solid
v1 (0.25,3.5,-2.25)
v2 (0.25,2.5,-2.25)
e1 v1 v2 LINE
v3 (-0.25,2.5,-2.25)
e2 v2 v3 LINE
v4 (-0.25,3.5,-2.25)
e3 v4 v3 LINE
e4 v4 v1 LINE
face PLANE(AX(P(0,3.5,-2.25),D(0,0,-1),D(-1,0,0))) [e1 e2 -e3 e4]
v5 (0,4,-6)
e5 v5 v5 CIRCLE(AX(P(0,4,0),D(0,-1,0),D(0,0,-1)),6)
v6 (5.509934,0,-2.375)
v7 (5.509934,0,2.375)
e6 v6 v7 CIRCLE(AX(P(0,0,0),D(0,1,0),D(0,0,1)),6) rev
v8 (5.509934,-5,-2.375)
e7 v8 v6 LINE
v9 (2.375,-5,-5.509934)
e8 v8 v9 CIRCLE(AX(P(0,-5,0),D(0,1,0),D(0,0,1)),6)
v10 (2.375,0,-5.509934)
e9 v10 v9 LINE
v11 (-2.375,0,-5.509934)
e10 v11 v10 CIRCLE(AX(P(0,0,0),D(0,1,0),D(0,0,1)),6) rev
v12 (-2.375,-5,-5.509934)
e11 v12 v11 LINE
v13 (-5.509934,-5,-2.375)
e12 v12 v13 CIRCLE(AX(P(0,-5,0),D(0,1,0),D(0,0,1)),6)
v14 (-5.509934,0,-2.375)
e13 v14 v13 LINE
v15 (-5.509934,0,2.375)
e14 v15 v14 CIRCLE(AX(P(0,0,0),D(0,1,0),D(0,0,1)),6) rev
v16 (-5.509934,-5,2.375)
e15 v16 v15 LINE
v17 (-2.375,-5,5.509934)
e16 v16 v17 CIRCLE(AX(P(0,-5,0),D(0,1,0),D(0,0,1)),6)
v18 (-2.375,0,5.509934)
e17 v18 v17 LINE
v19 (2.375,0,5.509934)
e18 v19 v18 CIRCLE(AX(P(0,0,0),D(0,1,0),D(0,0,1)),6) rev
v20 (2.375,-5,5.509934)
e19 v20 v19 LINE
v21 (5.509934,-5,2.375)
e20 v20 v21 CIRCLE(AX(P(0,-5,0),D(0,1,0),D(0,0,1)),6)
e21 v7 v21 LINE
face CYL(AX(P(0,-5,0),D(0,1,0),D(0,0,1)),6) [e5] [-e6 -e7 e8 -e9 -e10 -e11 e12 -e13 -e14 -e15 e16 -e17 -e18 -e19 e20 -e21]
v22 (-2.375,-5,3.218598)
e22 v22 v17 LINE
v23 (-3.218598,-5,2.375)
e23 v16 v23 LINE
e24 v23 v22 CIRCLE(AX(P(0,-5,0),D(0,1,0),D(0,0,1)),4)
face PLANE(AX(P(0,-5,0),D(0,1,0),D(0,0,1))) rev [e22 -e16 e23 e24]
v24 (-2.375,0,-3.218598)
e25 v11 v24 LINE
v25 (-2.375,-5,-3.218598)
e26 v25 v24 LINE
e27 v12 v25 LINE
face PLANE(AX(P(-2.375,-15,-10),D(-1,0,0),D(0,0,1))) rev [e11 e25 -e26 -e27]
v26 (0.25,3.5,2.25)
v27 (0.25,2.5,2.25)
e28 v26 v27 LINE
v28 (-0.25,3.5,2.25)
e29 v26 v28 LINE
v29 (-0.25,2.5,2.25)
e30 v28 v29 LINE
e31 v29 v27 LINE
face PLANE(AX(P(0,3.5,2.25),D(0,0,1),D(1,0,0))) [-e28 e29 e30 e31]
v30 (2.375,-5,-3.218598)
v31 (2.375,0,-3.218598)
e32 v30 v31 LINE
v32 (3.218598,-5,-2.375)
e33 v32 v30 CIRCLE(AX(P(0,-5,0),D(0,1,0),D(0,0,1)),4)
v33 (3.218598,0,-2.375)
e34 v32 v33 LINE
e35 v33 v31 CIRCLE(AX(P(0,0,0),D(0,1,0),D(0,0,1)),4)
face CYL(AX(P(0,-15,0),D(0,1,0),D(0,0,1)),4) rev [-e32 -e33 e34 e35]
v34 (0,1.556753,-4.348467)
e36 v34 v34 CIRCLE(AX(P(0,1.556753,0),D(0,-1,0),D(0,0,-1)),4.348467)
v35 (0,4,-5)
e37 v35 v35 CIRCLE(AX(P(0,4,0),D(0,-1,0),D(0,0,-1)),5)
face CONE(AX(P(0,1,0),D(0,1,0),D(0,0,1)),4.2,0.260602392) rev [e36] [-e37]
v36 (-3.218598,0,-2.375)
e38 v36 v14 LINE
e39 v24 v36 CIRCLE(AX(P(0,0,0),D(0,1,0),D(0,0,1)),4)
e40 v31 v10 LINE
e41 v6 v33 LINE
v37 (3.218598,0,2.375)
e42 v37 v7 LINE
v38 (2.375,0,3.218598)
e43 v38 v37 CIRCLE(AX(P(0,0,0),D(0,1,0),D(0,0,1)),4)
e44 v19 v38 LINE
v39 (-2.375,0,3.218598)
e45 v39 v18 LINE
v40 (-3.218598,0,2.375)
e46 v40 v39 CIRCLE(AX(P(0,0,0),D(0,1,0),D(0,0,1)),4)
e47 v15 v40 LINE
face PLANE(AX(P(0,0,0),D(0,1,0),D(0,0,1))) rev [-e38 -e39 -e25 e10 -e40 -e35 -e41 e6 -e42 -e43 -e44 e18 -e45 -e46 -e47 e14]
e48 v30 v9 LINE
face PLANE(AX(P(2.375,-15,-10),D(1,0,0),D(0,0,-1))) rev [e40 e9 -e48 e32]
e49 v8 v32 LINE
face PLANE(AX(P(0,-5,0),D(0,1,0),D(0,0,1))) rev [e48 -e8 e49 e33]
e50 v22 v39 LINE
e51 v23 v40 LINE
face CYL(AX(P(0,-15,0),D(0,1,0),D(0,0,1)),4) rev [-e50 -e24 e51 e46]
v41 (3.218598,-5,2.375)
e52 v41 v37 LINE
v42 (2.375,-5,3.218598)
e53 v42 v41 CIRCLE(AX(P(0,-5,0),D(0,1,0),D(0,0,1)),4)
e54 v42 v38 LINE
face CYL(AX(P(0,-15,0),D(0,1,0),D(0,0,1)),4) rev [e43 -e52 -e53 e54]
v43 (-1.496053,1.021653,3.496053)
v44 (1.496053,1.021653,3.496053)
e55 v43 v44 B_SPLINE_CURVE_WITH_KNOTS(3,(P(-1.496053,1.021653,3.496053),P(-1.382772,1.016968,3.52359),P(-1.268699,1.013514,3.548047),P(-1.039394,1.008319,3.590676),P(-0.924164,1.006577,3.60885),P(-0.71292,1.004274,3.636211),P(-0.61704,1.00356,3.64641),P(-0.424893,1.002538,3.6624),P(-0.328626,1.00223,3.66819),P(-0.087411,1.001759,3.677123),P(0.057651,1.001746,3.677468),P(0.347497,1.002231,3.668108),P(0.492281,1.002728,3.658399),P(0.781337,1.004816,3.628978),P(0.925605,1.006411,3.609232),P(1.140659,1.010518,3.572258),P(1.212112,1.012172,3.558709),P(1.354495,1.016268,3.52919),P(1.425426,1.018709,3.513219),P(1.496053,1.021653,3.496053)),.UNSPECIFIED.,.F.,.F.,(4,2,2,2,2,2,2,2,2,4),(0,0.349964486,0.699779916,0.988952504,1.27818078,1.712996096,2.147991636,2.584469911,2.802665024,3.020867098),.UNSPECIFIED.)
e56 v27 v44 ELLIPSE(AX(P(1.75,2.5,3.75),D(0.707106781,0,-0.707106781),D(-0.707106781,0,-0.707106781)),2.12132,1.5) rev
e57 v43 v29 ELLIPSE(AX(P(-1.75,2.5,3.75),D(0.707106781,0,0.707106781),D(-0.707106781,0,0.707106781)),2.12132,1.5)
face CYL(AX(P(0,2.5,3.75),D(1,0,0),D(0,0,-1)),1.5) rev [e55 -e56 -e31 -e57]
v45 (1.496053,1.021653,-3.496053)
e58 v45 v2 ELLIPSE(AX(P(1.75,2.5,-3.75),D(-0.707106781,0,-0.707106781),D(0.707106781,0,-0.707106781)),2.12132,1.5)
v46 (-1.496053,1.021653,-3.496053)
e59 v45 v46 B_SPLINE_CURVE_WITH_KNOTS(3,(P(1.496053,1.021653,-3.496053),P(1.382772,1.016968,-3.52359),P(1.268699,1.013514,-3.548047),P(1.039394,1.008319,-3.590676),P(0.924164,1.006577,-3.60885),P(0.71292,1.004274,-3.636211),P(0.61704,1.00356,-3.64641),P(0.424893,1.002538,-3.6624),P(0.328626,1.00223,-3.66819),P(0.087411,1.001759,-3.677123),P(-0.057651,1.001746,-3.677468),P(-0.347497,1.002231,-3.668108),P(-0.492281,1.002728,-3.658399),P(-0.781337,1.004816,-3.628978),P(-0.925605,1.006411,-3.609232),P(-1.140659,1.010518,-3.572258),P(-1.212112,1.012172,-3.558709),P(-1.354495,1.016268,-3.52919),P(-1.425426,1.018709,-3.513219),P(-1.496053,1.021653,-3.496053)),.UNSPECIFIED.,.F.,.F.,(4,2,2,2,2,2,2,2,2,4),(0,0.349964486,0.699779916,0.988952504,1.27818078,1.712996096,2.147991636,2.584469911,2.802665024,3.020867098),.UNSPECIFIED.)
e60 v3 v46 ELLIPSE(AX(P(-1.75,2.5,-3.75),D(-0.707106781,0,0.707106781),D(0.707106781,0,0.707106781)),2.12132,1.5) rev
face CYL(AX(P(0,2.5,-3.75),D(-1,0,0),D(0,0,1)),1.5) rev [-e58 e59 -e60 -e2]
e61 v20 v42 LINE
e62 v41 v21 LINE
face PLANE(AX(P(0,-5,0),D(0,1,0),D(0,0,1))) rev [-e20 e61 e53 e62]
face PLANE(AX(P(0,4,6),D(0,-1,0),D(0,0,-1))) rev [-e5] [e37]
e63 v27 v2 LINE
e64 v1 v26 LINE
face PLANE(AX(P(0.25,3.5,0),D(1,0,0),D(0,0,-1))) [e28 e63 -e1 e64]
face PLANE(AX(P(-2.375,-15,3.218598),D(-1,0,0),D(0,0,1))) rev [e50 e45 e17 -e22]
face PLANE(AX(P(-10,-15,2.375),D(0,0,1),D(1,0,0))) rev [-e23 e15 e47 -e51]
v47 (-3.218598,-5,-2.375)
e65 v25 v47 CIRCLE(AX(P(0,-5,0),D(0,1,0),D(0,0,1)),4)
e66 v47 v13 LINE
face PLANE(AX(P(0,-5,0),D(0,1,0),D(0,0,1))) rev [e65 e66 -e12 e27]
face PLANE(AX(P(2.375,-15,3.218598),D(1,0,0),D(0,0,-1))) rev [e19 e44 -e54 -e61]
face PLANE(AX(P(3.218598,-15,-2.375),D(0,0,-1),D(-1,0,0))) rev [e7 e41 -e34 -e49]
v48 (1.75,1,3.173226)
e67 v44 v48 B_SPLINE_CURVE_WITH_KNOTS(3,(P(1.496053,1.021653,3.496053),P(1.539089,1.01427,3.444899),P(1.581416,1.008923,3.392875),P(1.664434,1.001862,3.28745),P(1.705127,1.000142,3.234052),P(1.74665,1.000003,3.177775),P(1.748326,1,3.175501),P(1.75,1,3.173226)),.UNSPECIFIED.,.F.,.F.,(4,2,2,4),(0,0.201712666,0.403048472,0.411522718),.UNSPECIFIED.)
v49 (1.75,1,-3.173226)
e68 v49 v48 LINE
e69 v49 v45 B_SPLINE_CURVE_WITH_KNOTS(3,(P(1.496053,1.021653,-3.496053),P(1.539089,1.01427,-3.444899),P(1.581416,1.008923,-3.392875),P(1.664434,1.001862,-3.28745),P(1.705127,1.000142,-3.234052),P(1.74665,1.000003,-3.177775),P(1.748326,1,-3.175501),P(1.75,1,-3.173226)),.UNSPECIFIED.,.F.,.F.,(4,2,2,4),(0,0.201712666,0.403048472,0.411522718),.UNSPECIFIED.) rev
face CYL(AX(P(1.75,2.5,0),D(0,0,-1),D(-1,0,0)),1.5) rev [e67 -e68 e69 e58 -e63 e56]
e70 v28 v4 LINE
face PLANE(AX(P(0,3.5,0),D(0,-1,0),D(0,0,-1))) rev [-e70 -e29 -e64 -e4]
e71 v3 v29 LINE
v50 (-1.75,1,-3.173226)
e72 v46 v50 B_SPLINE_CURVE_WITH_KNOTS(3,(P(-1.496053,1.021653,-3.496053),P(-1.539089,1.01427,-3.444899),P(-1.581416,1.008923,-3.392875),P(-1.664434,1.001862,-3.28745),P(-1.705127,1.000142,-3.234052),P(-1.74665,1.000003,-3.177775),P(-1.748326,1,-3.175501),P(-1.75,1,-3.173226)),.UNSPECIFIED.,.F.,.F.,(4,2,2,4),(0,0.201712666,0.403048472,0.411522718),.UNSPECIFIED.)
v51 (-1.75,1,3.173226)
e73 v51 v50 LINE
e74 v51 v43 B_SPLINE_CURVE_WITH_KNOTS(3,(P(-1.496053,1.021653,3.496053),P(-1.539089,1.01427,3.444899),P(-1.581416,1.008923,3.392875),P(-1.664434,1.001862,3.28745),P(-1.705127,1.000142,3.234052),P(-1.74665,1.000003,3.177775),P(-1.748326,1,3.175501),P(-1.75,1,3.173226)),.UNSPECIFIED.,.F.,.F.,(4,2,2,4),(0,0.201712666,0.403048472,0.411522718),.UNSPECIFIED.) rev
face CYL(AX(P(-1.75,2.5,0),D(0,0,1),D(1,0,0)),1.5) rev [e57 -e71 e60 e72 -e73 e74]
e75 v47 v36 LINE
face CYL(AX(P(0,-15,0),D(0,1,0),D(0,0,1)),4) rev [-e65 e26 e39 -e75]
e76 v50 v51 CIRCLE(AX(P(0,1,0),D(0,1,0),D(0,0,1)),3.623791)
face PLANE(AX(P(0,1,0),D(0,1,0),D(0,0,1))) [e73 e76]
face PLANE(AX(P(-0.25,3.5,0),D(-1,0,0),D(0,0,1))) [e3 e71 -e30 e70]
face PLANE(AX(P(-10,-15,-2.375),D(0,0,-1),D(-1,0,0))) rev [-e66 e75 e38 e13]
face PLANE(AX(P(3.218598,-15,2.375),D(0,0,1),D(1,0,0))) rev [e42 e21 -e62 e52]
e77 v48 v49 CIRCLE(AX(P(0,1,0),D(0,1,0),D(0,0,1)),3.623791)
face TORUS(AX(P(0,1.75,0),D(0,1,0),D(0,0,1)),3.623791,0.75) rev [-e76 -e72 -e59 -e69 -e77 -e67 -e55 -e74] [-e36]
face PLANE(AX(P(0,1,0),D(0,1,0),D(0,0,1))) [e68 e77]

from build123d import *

# Parameters (mm, degrees)
BOSS_EXTRUDE1_DEPTH = 15
SKETCH2_R           = 6
BOSS_EXTRUDE2_DEPTH = 5
SKETCH2_2_R         = 6
BOSS_EXTRUDE3_DEPTH = 1
BOSS_EXTRUDE4_START = 1
SKETCH3_W           = 0.5
SKETCH3_H           = 4.5
BOSS_EXTRUDE4_DEPTH = 2.5
FILLET1_R           = 1.5
FILLET2_R           = 1.5


with BuildPart() as part:
    # Sketch1 → Boss-Extrude1 (new body)
    with BuildSketch(Plane(origin=(0, 0, 0), x_dir=(1, 0, 0), z_dir=(0, 1, 0))):
        with BuildLine():
            Line((-2.375, 10), (2.375, 10))
            Line((2.375, 10), (2.375, 3.218598297))
            ThreePointArc((2.375, 3.218598297), (2.828427125, 2.828427125), (3.218598297, 2.375))
            Line((3.218598297, 2.375), (10, 2.375))
            Line((10, 2.375), (10, -2.375))
            Line((10, -2.375), (3.218598297, -2.375))
            ThreePointArc((3.218598297, -2.375), (2.828427125, -2.828427125), (2.375, -3.218598297))
            Line((2.375, -3.218598297), (2.375, -10))
            Line((2.375, -10), (-2.375, -10))
            Line((-2.375, -10), (-2.375, -3.218598297))
            ThreePointArc((-2.375, -3.218598297), (-2.828427125, -2.828427125), (-3.218598297, -2.375))
            Line((-3.218598297, -2.375), (-10, -2.375))
            Line((-10, -2.375), (-10, 2.375))
            Line((-10, 2.375), (-3.218598297, 2.375))
            ThreePointArc((-3.218598297, 2.375), (-2.828427125, 2.828427125), (-2.375, 3.218598297))
            Line((-2.375, 3.218598297), (-2.375, 10))
        make_face()
    extrude(amount=-BOSS_EXTRUDE1_DEPTH)


with BuildPart() as body_2:
    # Sketch2 → Boss-Extrude2 (new body)
    with BuildSketch(Plane(origin=(0, 0, 0), x_dir=(1, 0, 0), z_dir=(0, 1, 0))):
        with Locations(Location((0, 0, 0), (0, 0, 270))):
            Circle(SKETCH2_R)
    extrude(amount=-BOSS_EXTRUDE2_DEPTH)

    # Sketch2<2> → Boss-Extrude3 (add)
    with BuildSketch(Plane(origin=(0, 0, 0), x_dir=(1, 0, 0), z_dir=(0, 1, 0))):
        with Locations(Location((0, 0, 0), (0, 0, 270))):
            Circle(SKETCH2_2_R)
    extrude(amount=BOSS_EXTRUDE3_DEPTH)

    # Combine1: cut part
    add(part.part, mode=Mode.SUBTRACT)

    # Sketch3 → Boss-Extrude4 (add)
    with BuildSketch(Plane(origin=(0, 0, 0), x_dir=(1, 0, 0), z_dir=(0, 1, 0)).offset(BOSS_EXTRUDE4_START)):
        Rectangle(SKETCH3_W, SKETCH3_H)
    extrude(amount=BOSS_EXTRUDE4_DEPTH)

    # Fillet1
    fillet1_edges = [body_2.edges().sort_by_distance(p)[0] for p in [
        (0.25, 1, 0),
        (-0.25, 1, 0),
    ]]
    fillet(fillet1_edges, radius=FILLET1_R)

    # Fillet2
    fillet2_edges = [body_2.edges().sort_by_distance(p)[0] for p in [
        (0, 1, -2.25),
        (0, 1, 2.25),
    ]]
    fillet(fillet2_edges, radius=FILLET2_R)

    # Sketch4 → Revolve1 (revolve)
    with BuildSketch(Plane(origin=(0, 0, 0), x_dir=(0, 0, -1), z_dir=(1, 0, 0)), mode=Mode.PRIVATE) as revolve1_sk:
        Polygon((-6, 1), (-6, 4), (-5, 4), (-4.2, 1), align=None)
    revolve(revolve1_sk.sketch.rotate(Axis((0, 0, 0), (0, 1, 0)), 180), axis=Axis((0, 0, 0), (0, 1, 0)))

    # Fillet3: read off the stored shape, not the designer's step
    # Fillet3 outline → Fillet3 (revolve)
    with BuildSketch(Plane.XY):
        with BuildLine():
            ThreePointArc((4.34846747, 1.556753012), (4.08071837, 1.155258358), (3.623791265, 1))
            Line((3.623791265, 1), (4.34846747, 1))
            Line((4.34846747, 1), (4.34846747, 1.556753012))
        make_face()
    revolve(axis=Axis((0, 0, 0), (0, 1, 0)))


solid = body_2.part
